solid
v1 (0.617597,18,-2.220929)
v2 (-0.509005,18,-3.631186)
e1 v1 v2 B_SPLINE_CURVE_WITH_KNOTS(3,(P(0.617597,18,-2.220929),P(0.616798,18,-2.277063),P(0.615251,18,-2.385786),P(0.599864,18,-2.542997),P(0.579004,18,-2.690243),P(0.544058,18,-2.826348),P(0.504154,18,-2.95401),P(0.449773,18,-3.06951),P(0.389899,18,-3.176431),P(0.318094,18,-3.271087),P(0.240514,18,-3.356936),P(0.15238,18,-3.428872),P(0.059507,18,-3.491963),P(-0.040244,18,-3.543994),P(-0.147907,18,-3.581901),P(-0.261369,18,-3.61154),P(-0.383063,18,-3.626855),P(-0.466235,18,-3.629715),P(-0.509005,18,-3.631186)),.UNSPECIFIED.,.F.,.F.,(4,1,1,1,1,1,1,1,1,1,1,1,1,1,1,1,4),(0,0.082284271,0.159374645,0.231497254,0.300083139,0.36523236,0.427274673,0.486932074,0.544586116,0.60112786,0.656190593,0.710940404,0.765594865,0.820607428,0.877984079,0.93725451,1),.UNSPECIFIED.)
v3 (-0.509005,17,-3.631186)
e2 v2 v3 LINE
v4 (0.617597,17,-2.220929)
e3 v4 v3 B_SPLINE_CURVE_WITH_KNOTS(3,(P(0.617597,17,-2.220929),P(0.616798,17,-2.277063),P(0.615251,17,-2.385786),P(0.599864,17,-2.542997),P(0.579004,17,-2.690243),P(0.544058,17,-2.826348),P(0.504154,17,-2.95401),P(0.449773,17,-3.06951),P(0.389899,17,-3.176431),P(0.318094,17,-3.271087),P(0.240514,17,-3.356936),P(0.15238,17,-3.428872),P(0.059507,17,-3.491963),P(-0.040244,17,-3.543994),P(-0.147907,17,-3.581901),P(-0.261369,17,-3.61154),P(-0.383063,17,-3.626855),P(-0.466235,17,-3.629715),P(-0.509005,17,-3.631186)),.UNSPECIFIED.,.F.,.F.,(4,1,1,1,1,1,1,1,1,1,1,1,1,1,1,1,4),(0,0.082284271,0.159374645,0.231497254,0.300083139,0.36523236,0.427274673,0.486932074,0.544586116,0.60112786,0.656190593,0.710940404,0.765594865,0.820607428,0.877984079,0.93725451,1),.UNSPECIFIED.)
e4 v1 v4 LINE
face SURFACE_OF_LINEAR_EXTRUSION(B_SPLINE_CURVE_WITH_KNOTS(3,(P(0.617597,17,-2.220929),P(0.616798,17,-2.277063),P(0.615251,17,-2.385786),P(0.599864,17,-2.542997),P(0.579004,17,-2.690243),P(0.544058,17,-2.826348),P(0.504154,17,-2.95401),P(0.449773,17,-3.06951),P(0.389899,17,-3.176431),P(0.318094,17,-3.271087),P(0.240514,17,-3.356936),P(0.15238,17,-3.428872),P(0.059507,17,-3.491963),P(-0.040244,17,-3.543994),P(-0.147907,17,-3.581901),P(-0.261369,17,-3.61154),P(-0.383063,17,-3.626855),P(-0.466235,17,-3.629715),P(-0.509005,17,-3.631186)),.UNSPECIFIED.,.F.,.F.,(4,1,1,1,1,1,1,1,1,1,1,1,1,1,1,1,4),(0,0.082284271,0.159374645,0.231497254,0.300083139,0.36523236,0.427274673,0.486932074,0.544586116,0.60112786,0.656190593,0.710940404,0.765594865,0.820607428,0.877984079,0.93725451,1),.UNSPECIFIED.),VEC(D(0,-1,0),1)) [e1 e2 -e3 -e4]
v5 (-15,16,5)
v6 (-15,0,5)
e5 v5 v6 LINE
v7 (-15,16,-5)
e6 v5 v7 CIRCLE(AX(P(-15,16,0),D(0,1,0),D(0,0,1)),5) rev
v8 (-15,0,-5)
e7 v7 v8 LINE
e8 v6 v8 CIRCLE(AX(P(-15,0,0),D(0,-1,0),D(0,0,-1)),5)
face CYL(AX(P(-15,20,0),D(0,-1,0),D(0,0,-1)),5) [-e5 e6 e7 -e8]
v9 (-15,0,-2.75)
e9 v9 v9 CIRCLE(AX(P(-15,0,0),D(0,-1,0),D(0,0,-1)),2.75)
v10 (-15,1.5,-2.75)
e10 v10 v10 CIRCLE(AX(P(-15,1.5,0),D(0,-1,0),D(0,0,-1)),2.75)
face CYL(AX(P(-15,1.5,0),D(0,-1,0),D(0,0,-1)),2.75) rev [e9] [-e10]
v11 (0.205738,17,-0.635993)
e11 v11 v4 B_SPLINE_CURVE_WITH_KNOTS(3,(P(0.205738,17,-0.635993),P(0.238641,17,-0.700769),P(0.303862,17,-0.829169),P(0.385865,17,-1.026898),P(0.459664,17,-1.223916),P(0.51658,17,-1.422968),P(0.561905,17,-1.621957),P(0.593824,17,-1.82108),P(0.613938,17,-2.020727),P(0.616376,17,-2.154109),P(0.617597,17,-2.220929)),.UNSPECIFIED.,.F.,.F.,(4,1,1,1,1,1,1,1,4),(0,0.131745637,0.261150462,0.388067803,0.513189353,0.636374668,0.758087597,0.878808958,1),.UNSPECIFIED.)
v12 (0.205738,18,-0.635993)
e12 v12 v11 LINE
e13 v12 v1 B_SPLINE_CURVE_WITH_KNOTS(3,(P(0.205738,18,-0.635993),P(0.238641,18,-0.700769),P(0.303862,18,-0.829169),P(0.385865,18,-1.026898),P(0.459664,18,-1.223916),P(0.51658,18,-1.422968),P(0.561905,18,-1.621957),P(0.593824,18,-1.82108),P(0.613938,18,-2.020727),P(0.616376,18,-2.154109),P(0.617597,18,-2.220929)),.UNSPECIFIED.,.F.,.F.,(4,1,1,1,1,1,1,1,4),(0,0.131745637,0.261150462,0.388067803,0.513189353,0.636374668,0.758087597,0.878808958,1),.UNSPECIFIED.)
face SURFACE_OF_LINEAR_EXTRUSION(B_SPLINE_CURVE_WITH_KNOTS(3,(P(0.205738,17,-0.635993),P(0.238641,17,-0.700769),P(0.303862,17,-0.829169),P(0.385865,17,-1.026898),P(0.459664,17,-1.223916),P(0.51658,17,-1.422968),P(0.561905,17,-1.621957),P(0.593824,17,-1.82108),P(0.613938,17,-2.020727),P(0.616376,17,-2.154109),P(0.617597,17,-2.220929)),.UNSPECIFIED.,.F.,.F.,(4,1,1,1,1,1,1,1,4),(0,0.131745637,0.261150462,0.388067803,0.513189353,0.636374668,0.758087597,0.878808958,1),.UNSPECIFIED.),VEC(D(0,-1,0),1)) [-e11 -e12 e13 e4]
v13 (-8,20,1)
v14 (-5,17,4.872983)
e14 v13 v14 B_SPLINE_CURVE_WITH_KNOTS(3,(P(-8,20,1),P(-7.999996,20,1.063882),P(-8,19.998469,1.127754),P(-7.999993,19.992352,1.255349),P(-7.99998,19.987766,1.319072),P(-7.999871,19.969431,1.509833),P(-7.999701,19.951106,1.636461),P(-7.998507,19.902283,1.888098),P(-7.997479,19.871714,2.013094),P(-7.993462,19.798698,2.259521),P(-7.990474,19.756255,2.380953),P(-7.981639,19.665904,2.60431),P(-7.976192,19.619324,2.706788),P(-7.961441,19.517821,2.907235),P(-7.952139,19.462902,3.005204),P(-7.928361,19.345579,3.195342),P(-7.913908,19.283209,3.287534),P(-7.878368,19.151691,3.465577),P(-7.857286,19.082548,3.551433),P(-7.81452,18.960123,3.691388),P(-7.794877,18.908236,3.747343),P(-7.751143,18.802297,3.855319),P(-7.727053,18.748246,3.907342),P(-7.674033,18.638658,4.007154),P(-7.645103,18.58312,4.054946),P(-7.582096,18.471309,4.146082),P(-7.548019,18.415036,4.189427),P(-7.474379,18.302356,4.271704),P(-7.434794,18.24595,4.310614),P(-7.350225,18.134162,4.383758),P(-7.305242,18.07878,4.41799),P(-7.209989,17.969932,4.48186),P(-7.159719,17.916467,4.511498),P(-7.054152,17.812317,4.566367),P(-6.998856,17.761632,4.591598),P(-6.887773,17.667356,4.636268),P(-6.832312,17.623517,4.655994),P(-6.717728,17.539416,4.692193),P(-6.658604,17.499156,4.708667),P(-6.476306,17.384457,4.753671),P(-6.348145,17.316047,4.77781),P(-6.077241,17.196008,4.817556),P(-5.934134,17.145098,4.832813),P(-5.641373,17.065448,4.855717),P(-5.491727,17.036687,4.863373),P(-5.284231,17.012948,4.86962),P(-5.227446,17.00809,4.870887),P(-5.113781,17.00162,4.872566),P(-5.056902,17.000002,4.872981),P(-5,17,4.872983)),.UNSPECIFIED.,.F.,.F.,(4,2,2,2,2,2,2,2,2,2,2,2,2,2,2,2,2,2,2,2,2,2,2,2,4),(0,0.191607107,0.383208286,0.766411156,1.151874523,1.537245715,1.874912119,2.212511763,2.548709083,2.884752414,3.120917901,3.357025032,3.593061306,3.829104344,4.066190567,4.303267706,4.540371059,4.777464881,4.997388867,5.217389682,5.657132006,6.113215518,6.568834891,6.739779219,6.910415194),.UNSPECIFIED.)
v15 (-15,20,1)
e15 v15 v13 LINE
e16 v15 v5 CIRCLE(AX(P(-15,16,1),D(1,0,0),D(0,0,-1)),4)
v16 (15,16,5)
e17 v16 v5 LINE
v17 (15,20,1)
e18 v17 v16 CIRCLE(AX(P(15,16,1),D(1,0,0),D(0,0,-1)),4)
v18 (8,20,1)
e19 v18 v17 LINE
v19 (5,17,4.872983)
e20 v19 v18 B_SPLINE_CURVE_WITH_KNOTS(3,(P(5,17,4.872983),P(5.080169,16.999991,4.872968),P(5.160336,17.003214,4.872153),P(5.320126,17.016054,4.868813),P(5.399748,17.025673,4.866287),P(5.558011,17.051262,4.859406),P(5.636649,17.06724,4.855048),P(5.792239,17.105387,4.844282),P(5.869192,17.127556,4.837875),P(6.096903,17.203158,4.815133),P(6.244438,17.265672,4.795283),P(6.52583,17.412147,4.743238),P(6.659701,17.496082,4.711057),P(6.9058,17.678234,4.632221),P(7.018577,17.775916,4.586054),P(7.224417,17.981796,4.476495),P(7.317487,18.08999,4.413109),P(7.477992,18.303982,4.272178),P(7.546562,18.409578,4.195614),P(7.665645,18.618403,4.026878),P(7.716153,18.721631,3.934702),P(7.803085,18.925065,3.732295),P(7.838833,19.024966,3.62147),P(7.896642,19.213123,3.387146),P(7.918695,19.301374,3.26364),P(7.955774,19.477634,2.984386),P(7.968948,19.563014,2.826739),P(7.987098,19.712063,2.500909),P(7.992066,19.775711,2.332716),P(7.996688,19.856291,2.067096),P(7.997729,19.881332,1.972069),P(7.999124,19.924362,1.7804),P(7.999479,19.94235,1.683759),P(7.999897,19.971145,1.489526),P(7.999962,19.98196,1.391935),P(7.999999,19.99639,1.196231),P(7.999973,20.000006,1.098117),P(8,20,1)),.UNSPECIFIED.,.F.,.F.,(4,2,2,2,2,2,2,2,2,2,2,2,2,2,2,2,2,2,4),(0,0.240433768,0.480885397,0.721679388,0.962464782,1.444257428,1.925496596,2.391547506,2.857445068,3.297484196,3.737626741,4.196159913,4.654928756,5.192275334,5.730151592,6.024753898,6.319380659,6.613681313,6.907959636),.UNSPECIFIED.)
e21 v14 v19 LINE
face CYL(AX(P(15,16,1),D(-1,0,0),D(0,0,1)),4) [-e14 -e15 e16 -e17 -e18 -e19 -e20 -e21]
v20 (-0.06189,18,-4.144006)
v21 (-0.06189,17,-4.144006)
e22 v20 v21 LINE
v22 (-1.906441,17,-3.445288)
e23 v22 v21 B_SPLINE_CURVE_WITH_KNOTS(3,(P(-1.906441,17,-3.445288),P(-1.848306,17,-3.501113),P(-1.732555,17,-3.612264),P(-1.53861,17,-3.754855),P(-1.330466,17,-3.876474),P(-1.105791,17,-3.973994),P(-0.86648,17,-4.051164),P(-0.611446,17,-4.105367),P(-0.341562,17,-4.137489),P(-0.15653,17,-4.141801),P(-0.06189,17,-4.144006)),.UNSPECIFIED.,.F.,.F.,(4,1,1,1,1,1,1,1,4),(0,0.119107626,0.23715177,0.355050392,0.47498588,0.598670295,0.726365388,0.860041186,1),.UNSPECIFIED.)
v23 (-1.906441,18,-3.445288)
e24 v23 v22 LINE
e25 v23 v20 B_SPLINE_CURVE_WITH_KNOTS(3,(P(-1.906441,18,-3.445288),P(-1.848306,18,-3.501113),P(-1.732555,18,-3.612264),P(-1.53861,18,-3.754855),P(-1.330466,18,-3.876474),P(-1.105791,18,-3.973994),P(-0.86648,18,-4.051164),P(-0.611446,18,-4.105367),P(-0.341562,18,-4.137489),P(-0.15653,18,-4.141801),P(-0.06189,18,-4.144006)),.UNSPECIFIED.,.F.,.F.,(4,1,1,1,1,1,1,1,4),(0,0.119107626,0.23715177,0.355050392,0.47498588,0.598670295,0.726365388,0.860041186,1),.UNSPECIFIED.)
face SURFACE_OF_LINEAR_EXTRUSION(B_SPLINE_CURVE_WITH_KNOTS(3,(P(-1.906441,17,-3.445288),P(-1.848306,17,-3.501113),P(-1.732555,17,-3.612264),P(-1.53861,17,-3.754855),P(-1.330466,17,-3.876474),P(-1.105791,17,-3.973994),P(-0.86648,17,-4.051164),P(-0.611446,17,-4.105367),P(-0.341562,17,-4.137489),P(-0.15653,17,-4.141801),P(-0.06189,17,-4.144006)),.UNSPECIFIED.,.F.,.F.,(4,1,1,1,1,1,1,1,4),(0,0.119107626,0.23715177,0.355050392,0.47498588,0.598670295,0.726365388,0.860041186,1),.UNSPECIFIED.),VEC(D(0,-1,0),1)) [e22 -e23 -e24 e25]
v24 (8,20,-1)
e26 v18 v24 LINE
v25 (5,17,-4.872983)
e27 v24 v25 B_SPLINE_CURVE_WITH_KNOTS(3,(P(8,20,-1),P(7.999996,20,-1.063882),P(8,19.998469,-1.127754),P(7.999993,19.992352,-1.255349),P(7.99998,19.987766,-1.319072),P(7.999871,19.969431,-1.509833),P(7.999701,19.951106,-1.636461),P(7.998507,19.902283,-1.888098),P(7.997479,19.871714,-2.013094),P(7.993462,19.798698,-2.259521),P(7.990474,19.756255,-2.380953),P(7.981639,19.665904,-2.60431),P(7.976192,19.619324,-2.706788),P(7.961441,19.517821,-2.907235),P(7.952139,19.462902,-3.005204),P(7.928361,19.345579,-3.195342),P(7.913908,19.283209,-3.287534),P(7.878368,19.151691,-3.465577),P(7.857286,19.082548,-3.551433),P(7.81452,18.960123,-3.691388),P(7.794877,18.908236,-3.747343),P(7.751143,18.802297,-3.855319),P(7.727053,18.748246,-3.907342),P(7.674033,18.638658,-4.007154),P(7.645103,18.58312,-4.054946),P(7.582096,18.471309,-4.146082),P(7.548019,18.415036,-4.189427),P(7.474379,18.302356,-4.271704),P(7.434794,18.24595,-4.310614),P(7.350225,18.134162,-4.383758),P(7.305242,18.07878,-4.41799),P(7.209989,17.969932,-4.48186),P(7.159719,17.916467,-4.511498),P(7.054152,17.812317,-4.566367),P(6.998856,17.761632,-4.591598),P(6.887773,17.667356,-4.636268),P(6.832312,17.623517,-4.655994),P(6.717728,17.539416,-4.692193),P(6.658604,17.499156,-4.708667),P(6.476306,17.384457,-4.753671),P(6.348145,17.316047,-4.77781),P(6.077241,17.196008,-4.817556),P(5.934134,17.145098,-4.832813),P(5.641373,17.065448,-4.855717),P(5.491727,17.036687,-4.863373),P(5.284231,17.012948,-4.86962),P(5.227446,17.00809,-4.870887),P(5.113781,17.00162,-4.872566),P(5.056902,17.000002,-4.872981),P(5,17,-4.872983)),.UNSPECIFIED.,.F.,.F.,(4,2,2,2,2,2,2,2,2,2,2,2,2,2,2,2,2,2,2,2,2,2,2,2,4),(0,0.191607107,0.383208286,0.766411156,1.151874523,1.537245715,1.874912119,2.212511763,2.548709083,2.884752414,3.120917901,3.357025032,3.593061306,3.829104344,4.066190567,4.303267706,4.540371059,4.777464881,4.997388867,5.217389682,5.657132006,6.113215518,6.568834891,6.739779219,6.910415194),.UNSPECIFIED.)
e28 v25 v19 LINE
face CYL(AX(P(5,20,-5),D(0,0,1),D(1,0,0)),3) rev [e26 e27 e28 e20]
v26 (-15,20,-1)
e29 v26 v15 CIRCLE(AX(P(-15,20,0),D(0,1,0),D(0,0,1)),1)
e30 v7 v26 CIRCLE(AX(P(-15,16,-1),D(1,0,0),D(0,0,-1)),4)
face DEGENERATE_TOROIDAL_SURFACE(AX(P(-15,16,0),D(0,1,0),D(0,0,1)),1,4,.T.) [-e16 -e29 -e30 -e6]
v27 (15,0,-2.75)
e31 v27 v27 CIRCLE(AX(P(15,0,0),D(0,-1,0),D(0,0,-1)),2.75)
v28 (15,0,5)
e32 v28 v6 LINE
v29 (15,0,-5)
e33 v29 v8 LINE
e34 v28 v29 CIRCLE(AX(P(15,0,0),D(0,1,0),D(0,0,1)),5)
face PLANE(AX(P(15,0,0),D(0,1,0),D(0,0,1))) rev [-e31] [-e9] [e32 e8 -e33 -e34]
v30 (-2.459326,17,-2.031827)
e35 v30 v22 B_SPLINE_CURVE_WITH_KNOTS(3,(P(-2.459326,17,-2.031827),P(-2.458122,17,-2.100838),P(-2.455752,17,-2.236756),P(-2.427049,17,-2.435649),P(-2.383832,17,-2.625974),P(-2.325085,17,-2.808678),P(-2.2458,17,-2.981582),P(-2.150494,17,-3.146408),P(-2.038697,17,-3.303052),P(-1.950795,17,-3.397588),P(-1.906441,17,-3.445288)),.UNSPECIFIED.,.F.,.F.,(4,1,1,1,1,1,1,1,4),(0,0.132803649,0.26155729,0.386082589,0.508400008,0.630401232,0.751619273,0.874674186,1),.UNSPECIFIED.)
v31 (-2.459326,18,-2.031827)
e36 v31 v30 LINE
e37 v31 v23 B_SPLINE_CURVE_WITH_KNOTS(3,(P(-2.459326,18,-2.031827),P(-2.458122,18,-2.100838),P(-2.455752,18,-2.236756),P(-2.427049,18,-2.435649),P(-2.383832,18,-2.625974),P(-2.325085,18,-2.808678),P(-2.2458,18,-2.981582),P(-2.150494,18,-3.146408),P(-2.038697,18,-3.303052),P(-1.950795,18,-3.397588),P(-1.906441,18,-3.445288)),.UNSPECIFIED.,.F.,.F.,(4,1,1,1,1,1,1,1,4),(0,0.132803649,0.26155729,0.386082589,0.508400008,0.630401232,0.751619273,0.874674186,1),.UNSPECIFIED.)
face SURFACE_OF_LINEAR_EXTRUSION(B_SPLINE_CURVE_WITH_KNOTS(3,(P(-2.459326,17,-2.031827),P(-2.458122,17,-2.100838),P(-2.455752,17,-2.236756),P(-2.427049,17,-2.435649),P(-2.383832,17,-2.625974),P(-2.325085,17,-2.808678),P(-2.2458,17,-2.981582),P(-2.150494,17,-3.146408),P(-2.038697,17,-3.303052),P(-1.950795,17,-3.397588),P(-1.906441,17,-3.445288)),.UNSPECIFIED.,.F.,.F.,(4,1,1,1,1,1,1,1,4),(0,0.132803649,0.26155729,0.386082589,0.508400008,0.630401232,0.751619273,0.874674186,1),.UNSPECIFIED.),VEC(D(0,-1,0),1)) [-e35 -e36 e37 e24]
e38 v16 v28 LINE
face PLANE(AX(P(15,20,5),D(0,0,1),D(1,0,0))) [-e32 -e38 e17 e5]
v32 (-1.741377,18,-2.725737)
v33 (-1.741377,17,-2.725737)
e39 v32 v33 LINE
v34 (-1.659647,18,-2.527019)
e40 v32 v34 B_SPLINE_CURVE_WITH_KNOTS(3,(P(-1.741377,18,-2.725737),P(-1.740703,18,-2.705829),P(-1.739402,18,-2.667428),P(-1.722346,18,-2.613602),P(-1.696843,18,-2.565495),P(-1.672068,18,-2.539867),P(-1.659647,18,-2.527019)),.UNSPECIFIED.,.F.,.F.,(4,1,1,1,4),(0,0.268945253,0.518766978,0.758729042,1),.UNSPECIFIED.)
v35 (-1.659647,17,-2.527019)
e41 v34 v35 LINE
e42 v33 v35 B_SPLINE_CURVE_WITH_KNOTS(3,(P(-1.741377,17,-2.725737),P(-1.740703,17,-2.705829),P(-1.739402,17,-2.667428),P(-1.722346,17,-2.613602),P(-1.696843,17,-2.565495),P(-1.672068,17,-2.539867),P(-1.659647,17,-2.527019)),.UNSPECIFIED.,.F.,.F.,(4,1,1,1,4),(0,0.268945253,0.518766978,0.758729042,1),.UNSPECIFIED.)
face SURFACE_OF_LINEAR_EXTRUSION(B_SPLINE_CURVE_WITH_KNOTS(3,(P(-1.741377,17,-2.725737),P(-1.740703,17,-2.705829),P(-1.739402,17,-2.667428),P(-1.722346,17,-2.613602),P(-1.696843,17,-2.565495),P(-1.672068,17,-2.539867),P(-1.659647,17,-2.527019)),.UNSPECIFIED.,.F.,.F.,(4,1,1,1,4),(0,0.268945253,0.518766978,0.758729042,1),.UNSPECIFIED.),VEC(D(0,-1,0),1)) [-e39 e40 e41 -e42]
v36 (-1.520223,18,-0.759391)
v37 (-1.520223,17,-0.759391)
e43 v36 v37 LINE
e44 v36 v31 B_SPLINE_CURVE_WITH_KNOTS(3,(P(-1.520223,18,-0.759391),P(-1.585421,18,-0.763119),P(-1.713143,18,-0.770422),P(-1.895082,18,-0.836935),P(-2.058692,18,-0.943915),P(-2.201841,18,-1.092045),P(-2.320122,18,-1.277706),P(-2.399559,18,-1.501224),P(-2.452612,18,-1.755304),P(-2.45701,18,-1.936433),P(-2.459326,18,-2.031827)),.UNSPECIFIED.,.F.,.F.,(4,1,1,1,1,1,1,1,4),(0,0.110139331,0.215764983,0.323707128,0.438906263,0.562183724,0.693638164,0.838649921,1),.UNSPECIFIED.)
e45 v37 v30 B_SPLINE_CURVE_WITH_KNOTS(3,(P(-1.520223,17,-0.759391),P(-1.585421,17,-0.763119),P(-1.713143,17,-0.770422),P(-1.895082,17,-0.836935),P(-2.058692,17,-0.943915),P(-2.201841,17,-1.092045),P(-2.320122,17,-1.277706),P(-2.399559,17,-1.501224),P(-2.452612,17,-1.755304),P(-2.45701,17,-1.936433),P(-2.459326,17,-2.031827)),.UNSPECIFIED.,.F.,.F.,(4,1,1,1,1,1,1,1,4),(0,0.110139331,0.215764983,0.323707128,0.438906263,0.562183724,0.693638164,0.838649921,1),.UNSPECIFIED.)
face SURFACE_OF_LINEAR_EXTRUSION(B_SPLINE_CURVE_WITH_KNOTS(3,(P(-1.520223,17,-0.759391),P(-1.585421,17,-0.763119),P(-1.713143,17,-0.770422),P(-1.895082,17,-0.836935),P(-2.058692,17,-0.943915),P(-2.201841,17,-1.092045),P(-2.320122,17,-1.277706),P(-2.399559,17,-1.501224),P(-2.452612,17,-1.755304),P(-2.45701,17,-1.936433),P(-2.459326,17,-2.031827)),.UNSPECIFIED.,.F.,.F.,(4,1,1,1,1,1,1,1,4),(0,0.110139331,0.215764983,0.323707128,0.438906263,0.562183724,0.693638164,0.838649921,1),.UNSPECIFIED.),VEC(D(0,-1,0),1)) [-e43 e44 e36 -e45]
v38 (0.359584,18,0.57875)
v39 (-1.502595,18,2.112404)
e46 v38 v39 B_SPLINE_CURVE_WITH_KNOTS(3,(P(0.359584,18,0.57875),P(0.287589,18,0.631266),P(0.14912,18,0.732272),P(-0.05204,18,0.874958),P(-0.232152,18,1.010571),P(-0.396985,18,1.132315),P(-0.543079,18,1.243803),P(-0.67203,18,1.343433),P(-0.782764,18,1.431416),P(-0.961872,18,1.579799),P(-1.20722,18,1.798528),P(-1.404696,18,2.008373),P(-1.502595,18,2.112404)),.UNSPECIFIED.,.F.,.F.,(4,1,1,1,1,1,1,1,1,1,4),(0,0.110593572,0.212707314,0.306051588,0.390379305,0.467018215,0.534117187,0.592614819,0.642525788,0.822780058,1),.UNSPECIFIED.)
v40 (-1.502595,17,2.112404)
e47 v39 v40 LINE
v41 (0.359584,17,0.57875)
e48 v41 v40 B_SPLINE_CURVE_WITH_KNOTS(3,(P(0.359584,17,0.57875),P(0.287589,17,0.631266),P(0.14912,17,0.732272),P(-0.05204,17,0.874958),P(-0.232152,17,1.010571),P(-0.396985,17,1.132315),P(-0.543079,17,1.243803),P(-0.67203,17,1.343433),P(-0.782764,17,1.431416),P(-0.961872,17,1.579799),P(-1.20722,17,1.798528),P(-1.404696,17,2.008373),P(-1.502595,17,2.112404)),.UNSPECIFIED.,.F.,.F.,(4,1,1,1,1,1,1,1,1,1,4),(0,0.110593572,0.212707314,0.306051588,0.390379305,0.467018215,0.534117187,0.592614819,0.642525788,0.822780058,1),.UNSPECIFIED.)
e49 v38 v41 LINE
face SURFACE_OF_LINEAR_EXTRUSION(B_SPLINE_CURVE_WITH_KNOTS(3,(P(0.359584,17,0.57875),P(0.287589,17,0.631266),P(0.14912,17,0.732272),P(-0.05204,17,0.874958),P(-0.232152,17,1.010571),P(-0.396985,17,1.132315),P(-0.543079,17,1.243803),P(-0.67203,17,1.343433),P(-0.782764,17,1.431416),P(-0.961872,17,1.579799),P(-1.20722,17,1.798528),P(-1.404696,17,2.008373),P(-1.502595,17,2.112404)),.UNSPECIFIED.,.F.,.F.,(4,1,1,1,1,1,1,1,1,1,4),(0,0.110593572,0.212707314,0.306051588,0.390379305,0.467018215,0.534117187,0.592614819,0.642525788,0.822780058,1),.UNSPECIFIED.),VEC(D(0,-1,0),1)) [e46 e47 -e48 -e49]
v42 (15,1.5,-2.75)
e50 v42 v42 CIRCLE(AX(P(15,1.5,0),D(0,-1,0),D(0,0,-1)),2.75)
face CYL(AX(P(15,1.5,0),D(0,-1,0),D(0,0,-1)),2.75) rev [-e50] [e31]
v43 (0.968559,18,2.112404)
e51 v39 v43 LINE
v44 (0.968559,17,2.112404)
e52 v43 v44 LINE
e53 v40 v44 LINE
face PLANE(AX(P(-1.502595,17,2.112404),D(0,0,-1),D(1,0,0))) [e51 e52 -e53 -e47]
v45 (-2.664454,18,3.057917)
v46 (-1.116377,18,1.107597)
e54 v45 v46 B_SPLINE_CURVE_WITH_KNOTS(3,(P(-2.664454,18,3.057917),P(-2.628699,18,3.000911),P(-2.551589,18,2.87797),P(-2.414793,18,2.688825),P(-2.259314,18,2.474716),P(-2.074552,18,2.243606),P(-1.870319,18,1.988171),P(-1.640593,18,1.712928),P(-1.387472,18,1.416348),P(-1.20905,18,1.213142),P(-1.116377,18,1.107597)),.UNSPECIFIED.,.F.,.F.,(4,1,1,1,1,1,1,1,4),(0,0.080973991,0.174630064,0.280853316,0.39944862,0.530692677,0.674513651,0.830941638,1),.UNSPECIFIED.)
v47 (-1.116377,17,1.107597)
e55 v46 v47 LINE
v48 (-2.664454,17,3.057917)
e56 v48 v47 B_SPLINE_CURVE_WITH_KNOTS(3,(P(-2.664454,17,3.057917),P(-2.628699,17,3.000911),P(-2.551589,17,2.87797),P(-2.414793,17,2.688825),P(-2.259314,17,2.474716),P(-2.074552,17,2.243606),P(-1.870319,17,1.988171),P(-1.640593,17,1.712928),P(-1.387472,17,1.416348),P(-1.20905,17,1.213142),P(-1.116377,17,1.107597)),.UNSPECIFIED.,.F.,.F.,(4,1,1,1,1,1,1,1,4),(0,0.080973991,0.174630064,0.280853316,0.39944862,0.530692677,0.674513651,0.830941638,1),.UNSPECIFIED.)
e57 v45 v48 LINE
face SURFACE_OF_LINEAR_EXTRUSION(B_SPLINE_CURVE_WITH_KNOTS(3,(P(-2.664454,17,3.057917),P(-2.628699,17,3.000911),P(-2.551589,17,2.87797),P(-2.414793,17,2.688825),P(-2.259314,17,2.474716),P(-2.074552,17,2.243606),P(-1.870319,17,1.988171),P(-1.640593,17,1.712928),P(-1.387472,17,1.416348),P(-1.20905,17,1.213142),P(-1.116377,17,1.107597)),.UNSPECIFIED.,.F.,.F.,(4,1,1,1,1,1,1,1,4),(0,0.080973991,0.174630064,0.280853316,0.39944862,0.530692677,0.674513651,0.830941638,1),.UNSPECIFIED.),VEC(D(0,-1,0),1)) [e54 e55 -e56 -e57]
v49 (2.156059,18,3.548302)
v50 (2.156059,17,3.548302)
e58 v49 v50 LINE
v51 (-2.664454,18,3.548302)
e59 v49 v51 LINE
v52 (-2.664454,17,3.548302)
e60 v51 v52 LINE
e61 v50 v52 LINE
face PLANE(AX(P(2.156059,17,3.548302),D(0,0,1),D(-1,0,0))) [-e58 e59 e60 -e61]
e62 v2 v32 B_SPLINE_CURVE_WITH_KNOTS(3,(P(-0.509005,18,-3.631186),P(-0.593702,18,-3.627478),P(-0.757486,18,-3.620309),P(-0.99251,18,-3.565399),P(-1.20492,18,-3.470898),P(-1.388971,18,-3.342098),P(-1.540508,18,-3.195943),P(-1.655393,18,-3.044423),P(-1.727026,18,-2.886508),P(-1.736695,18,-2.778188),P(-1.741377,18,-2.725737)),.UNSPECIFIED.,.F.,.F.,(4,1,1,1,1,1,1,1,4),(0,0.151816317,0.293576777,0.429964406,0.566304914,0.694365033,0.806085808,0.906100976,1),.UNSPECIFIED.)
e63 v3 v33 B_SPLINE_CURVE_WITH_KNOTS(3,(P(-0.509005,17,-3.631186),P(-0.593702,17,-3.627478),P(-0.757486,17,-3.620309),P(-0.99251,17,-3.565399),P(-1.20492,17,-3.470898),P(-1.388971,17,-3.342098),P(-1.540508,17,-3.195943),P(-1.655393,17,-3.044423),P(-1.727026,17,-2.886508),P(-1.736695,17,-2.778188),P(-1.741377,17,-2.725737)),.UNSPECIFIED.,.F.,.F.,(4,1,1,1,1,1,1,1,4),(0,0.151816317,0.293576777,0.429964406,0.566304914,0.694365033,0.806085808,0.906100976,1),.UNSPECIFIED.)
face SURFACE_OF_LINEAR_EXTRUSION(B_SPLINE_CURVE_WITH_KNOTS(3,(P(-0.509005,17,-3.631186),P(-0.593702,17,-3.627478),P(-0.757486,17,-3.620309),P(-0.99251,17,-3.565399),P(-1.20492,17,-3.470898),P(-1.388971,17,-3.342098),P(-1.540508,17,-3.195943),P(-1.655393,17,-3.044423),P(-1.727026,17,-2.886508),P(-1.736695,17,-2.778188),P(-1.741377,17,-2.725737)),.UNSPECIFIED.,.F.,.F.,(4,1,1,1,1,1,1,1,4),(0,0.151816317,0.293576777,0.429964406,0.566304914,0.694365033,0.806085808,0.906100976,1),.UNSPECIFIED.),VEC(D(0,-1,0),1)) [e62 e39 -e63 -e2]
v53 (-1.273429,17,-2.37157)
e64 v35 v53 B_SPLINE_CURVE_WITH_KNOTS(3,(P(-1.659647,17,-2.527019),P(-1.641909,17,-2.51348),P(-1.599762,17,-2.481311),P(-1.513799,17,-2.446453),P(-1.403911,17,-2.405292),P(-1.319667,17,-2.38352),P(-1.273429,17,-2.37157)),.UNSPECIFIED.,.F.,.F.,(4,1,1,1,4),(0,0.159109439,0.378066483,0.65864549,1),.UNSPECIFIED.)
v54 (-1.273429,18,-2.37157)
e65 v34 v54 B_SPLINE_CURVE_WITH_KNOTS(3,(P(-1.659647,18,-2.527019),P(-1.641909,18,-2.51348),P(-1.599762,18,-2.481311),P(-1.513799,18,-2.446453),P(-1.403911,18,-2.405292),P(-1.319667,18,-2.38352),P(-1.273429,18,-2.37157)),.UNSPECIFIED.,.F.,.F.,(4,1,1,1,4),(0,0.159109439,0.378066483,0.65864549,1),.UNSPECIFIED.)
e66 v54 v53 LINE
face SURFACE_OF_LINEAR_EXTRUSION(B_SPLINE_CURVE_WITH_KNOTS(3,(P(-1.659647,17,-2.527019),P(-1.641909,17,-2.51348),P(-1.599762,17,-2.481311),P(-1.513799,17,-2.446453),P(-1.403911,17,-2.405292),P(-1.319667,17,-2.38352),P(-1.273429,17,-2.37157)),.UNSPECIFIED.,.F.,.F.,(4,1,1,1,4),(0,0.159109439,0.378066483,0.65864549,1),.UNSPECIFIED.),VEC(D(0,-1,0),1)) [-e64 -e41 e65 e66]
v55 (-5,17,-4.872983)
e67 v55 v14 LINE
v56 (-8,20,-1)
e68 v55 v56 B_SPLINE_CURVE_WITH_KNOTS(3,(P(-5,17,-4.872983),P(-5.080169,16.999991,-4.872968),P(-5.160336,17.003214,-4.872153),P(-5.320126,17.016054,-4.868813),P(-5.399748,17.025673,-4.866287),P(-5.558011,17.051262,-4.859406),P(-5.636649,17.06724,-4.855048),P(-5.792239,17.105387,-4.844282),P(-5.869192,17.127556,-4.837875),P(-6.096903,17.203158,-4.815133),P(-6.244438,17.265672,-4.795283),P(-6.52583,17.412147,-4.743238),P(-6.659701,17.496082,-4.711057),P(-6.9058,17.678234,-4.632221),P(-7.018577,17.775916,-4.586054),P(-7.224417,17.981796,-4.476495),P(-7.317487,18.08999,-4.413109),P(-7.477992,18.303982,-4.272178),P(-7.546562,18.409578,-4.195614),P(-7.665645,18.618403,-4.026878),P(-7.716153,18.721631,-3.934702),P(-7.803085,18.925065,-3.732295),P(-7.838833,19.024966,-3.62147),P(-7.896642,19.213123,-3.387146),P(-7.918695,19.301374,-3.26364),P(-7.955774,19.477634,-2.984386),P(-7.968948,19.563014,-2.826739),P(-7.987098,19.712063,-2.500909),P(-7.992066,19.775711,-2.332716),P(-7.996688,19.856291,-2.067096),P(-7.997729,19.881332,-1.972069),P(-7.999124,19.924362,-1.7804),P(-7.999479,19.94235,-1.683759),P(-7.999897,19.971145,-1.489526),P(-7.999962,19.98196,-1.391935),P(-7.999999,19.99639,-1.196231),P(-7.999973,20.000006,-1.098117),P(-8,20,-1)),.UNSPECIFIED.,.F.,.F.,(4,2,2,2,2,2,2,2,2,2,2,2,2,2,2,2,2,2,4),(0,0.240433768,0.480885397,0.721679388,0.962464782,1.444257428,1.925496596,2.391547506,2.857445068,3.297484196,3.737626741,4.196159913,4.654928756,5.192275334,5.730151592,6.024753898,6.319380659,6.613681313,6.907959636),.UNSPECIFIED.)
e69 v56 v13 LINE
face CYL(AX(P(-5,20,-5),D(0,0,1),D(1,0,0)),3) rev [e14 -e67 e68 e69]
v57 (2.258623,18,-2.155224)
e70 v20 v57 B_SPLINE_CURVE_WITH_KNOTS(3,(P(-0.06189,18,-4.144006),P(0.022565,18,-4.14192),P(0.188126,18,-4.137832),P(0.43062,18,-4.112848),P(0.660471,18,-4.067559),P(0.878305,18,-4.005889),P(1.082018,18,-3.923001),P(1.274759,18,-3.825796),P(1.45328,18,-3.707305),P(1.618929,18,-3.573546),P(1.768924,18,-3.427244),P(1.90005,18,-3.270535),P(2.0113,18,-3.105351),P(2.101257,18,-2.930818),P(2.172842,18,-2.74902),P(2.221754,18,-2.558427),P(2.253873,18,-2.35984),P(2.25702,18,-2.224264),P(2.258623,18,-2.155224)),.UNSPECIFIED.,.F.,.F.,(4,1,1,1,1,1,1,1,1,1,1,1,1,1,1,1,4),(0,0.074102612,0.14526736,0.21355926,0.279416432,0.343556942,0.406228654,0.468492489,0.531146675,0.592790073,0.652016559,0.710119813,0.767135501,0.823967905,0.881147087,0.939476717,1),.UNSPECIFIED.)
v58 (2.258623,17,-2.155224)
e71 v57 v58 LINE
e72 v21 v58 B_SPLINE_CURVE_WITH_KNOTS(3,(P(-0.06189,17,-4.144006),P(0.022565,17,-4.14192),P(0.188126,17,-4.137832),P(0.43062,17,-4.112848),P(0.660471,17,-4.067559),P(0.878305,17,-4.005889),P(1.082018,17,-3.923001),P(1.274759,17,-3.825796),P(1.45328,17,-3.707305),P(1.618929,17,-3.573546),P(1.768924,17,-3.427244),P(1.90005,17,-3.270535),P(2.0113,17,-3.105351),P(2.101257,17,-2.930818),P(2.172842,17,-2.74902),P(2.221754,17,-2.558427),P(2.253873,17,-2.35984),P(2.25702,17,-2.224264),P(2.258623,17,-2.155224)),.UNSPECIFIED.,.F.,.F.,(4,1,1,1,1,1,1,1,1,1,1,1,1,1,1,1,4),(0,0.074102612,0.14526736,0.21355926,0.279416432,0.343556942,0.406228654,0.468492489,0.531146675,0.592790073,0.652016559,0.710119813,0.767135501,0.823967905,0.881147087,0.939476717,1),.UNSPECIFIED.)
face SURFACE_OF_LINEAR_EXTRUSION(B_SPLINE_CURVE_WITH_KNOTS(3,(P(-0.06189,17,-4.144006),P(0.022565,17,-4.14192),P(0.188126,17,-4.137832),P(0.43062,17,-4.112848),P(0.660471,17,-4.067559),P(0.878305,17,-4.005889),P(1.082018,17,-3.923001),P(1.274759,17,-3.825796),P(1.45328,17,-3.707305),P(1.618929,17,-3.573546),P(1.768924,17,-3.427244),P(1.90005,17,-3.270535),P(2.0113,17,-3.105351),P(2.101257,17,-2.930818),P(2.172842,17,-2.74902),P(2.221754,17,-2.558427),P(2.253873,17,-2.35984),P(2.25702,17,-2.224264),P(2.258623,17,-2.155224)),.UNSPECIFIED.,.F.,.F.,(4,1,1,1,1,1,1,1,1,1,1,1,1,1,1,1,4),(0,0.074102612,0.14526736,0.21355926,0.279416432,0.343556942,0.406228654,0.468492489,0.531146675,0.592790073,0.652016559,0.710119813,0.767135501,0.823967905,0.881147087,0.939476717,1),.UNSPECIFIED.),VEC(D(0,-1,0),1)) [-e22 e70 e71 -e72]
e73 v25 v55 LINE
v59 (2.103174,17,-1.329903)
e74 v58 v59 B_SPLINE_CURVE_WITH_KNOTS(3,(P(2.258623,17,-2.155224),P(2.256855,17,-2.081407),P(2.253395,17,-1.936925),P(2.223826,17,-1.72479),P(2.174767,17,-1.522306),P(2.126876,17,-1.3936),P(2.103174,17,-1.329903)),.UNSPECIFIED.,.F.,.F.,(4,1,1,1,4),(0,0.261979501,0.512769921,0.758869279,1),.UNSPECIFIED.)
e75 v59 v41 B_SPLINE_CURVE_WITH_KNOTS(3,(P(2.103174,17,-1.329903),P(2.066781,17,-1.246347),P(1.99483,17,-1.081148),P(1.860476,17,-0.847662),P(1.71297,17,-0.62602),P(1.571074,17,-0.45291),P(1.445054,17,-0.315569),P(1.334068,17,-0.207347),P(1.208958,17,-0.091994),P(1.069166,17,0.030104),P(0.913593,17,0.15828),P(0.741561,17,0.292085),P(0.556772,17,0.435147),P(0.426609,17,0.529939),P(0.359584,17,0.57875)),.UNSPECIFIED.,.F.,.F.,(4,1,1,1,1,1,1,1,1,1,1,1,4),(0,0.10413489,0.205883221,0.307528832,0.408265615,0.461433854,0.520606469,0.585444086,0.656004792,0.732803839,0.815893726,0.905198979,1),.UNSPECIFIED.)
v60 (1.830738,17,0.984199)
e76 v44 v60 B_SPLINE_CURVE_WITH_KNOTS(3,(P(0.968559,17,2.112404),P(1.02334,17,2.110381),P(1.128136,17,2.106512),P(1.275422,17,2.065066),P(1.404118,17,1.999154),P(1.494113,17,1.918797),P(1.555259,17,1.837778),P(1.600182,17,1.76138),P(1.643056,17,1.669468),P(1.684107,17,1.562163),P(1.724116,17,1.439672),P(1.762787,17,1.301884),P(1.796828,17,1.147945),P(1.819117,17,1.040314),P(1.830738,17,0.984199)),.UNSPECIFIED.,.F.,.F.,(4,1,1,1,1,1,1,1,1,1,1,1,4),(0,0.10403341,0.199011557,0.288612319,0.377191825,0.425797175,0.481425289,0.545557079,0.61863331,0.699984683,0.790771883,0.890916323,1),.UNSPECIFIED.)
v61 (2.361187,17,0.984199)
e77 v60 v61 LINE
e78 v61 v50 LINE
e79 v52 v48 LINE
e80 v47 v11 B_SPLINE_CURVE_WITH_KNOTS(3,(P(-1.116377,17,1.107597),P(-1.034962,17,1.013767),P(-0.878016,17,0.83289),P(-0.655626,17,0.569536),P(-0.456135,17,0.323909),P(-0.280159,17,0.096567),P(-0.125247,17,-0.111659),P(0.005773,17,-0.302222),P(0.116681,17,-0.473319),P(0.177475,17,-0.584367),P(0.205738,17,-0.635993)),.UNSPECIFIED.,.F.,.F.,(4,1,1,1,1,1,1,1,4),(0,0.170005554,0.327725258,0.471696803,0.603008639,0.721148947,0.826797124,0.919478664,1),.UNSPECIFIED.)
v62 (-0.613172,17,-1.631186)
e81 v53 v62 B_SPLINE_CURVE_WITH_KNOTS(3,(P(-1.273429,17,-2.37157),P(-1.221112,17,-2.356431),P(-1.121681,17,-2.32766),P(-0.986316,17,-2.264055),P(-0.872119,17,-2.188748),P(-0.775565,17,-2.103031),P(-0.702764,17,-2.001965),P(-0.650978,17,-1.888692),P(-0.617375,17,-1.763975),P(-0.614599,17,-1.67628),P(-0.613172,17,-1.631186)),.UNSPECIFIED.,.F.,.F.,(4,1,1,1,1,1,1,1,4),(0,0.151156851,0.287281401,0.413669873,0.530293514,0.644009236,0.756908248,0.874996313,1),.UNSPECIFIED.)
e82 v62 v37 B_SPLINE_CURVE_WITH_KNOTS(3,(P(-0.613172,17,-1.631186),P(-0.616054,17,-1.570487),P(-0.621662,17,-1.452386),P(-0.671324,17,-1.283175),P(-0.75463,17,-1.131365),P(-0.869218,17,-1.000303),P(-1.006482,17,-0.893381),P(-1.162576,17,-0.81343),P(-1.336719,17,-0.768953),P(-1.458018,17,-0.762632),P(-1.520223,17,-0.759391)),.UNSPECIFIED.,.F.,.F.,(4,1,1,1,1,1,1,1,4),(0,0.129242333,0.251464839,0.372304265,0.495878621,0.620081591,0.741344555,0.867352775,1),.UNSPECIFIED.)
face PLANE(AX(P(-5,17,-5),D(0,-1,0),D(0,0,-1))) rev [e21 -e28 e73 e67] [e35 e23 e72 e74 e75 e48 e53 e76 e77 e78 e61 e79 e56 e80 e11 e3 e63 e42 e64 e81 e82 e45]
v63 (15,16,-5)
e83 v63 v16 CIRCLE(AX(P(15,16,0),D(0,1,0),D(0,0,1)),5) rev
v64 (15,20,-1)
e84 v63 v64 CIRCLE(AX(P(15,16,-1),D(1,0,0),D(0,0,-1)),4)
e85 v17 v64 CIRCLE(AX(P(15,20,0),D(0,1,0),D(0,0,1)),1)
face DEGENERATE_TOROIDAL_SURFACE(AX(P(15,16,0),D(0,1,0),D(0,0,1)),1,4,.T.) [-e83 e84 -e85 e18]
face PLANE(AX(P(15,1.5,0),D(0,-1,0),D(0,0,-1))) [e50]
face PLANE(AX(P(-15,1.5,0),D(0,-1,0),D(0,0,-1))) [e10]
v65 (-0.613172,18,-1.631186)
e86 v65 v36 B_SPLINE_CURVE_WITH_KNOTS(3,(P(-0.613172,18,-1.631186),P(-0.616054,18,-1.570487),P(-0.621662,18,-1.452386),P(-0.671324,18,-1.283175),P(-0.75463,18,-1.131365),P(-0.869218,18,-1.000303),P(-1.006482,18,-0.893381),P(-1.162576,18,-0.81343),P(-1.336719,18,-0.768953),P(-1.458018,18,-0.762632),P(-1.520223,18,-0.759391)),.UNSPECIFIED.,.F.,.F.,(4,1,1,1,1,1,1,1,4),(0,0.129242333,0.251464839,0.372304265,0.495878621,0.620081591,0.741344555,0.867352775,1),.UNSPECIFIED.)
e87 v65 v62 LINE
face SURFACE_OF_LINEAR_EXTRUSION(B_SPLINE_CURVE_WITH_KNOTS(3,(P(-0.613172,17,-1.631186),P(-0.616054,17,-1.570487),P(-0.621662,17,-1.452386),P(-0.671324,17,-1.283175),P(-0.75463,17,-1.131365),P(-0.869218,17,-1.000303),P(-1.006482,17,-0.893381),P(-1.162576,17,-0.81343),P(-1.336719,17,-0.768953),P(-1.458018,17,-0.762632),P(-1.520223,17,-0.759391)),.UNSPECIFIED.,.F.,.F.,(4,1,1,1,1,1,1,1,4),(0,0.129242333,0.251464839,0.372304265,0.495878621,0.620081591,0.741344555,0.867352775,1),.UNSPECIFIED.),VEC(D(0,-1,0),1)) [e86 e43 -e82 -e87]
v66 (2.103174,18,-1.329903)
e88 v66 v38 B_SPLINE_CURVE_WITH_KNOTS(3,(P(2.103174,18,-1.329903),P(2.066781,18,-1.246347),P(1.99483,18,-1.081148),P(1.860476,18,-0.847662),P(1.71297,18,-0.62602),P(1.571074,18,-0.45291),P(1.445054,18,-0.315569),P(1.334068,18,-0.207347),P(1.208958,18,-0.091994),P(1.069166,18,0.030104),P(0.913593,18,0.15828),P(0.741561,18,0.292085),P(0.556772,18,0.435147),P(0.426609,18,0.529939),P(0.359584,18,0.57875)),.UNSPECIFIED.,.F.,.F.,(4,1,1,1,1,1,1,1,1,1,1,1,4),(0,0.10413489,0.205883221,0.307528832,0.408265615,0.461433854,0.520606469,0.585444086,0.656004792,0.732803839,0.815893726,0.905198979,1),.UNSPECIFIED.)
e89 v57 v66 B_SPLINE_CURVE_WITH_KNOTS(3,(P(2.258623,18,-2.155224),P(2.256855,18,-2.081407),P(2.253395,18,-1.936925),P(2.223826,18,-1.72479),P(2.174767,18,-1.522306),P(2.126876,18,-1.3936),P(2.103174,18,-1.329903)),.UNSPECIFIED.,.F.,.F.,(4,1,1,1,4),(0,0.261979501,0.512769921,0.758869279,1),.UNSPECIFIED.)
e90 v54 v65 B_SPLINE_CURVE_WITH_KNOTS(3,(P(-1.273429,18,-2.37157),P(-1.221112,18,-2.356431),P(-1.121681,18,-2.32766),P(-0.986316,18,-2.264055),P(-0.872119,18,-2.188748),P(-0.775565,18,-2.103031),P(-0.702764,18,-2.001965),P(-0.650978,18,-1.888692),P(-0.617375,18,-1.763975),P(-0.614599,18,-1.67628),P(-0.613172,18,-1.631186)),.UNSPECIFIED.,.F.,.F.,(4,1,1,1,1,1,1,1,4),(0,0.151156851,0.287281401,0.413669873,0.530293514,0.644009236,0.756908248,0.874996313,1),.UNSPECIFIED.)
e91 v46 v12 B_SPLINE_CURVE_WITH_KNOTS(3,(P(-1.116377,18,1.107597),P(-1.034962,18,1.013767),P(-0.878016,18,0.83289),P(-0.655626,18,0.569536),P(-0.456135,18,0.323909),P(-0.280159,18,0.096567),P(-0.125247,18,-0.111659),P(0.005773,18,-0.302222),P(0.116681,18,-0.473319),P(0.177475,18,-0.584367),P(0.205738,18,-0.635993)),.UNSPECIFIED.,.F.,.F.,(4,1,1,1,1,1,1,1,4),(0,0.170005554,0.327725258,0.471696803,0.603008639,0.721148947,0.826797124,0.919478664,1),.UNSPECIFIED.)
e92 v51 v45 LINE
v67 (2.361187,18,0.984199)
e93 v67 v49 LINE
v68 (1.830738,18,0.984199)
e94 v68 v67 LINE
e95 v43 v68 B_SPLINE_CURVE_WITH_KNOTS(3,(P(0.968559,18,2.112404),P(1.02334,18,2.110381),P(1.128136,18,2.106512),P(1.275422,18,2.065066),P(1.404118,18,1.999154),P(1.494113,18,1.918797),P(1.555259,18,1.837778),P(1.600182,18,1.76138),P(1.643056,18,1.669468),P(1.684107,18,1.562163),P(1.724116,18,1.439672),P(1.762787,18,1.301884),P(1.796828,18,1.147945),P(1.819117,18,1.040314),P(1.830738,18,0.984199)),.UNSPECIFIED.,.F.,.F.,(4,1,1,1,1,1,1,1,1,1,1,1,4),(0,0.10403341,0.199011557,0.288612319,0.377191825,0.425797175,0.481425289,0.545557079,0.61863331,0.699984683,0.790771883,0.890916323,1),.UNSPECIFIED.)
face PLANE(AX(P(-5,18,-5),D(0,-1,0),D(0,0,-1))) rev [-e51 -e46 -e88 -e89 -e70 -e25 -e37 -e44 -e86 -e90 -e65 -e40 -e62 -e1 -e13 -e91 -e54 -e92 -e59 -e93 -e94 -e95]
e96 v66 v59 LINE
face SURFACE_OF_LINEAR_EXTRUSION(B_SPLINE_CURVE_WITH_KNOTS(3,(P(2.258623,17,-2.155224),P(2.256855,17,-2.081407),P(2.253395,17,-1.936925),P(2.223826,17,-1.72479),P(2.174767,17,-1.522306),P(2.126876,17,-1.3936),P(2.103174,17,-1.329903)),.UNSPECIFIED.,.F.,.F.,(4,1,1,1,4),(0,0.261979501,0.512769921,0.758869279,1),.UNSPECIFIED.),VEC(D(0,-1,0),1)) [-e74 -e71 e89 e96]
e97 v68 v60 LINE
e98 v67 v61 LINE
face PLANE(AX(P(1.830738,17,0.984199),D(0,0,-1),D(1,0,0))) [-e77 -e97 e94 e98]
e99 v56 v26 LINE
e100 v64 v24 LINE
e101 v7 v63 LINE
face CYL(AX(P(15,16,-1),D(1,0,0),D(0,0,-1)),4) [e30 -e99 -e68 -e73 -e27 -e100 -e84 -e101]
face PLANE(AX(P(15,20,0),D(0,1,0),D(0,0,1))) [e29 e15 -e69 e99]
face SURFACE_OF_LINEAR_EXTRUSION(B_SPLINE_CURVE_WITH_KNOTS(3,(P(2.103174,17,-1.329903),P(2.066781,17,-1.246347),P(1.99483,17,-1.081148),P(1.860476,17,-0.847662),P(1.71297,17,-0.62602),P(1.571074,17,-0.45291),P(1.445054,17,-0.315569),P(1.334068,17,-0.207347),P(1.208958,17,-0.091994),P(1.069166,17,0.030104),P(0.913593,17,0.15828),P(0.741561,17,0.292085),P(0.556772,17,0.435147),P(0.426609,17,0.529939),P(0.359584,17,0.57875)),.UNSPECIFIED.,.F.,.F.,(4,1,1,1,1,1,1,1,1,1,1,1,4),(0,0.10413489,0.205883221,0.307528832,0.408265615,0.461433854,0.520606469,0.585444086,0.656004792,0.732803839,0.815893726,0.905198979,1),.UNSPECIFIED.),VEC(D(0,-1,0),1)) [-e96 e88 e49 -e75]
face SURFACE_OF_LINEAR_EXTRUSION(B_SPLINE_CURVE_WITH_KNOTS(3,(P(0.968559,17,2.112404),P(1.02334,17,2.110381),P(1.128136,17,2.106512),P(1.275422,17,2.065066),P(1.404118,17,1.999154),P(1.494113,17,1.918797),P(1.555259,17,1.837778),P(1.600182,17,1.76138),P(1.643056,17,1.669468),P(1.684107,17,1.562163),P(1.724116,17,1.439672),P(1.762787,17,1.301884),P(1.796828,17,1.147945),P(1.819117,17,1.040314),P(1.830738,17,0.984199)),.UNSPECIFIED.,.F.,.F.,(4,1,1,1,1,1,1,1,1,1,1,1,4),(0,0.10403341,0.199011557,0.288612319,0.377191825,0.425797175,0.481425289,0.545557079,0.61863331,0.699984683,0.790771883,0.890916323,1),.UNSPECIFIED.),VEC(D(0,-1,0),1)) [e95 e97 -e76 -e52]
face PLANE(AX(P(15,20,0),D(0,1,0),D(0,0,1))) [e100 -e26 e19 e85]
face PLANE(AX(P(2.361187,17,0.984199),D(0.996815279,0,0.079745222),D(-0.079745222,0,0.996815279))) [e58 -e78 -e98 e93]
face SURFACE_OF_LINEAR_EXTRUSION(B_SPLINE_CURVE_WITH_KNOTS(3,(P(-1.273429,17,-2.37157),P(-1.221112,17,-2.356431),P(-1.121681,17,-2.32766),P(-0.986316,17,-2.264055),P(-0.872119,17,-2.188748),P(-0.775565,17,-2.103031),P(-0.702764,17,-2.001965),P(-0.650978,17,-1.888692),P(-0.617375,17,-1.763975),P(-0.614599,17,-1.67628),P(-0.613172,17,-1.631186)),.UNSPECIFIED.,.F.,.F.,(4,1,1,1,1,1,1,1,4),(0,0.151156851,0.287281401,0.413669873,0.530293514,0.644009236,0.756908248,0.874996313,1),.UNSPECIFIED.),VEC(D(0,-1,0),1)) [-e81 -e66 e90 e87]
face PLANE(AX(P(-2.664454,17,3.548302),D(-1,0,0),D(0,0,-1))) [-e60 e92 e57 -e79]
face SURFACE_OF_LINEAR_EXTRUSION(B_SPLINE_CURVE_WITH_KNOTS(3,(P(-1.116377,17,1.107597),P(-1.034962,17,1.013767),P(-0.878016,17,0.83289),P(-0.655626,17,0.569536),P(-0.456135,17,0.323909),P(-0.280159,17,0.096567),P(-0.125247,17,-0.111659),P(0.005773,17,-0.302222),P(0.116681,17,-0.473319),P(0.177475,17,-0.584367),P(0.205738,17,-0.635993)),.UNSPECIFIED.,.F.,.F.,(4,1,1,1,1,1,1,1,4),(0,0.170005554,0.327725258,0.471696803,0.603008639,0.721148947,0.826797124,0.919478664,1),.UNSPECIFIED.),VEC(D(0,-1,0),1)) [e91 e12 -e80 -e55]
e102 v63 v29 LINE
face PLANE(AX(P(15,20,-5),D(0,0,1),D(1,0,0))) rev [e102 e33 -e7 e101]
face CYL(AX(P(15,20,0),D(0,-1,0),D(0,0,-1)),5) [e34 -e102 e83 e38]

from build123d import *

# Parameters (mm, degrees)
BOSS_EXTRUDE1_DEPTH     = 20
FILLET1_R               = 4
SKETCH2_R               = 2.75
CUT_EXTRUDE1_DEPTH      = 1.5
LPATTERN1_COUNT         = 2
LPATTERN1_PITCH         = 30
CUT_EXTRUDE2_DEPTH      = 29.722813233
CUT_EXTRUDE2_DEPTH_BACK = 29.722813233
WRAP1_DEPTH             = 1


# Read off the part's stored shape, not the designer's step: Wrap1
with BuildPart() as part:
    # Sketch1 → Boss-Extrude1 (new body)
    with BuildSketch(Plane(origin=(0, 0, 0), x_dir=(1, 0, 0), z_dir=(0, 1, 0))):
        with BuildLine():
            Line((15, -5), (-15, -5))
            ThreePointArc((-15, -5), (-20, 0), (-15, 5))
            Line((-15, 5), (15, 5))
            ThreePointArc((15, 5), (20, 0), (15, -5))
        make_face()
    extrude(amount=BOSS_EXTRUDE1_DEPTH)

    # Fillet1
    fillet1_edges = [part.edges().sort_by_distance(p)[0] for p in [
        (-20, 20, 0),
        (0, 20, 5),
        (20, 20, 0),
        (0, 20, -5),
    ]]
    fillet(fillet1_edges, radius=FILLET1_R)

    # Sketch2 → Cut-Extrude1 (cut)
    with BuildSketch(Plane.XZ):
        with Locations(Location((-15, 0, 0), (0, 0, 270))):
            Circle(SKETCH2_R)
    cut_extrude1 = extrude(amount=-CUT_EXTRUDE1_DEPTH, mode=Mode.SUBTRACT)

    # LPattern1: Cut-Extrude1 ×2
    with Locations(*[(i * LPATTERN1_PITCH, 0, 0) for i in range(1, LPATTERN1_COUNT)]):
        add(cut_extrude1, mode=Mode.SUBTRACT)

    # Sketch3 → Cut-Extrude2 (cut, two sides: drawn at the far end of the back side and taken through both)
    with BuildSketch(Plane.XY.offset(-CUT_EXTRUDE2_DEPTH_BACK)):
        with BuildLine():
            Line((-5, 23), (5, 23))
            ThreePointArc((5, 23), (8, 20), (5, 17))
            Line((5, 17), (-5, 17))
            ThreePointArc((-5, 17), (-8, 20), (-5, 23))
        make_face()
    extrude(amount=CUT_EXTRUDE2_DEPTH + CUT_EXTRUDE2_DEPTH_BACK, mode=Mode.SUBTRACT)

    # Wrap1 outline → Wrap1 (add)
    with BuildSketch(Plane(origin=(0, 17, 0), x_dir=(1, 0, 0), z_dir=(0, 1, 0))):
        with BuildLine():
            add(Edge.make_bspline(
                [(0.968558604, -2.112404227), (1.023340463, -2.110381468), (1.128135866, -2.106512015), (1.275421614, -2.065066433), (1.40411806, -1.999153831), (1.494113345, -1.918796765), (1.555259283, -1.8377784), (1.600182088, -1.761379971), (1.643056037, -1.669468115), (1.68410688, -1.562162987), (1.724115658, -1.439672484), (1.762787282, -1.301883834), (1.796828359, -1.147944523), (1.819117415, -1.040313742), (1.830738091, -0.984199098)],
                knots=[0, 0, 0, 0, 0.10403341, 0.199011557, 0.288612319, 0.377191825, 0.425797175, 0.481425289, 0.545557079, 0.61863331, 0.699984683, 0.790771883, 0.890916323, 1, 1, 1, 1], degree=3))
            Line((0.968558604, -2.112404227), (-1.502595242, -2.112404227))
            add(Edge.make_bspline(
                [(0.359584245, -0.57875038), (0.287589412, -0.631266446), (0.149119993, -0.732271876), (-0.052040125, -0.874957595), (-0.232151558, -1.010570949), (-0.396984875, -1.13231455), (-0.543079134, -1.243803459), (-0.672030163, -1.343433338), (-0.782764208, -1.43141572), (-0.961872458, -1.579798827), (-1.207220157, -1.798528227), (-1.40469562, -2.00837263), (-1.502595242, -2.112404227)],
                knots=[0, 0, 0, 0, 0.110593572, 0.212707314, 0.306051588, 0.390379305, 0.467018215, 0.534117187, 0.592614819, 0.642525788, 0.822780058, 1, 1, 1, 1], degree=3))
            add(Edge.make_bspline(
                [(2.103173989, 1.329903466), (2.066781163, 1.246346618), (1.99482956, 1.081147874), (1.86047631, 0.847661593), (1.71297016, 0.626020413), (1.571074283, 0.452909604), (1.445054335, 0.315568643), (1.334068385, 0.207346612), (1.208958187, 0.091994137), (1.069166496, -0.030104), (0.913592831, -0.158279882), (0.741560734, -0.29208501), (0.556771712, -0.435146764), (0.42660857, -0.529939289), (0.359584245, -0.57875038)],
                knots=[0, 0, 0, 0, 0.10413489, 0.205883221, 0.307528832, 0.408265615, 0.461433854, 0.520606469, 0.585444086, 0.656004792, 0.732803839, 0.815893726, 0.905198979, 1, 1, 1, 1], degree=3))
            add(Edge.make_bspline(
                [(2.258622707, 2.155223979), (2.256854974, 2.081406691), (2.253395008, 1.936924834), (2.223825952, 1.724789841), (2.174767432, 1.522306219), (2.126875674, 1.393600214), (2.103173989, 1.329903466)],
                knots=[0, 0, 0, 0, 0.261979501, 0.512769921, 0.758869279, 1, 1, 1, 1], degree=3))
            add(Edge.make_bspline(
                [(-0.061890114, 4.14400603), (0.022564629, 4.141920306), (0.18812583, 4.13783155), (0.430620451, 4.112847977), (0.660471364, 4.067558501), (0.878305178, 4.005888588), (1.082018473, 3.923000729), (1.274759097, 3.825795699), (1.453280397, 3.707304776), (1.618929442, 3.573545968), (1.768923738, 3.427244365), (1.900049838, 3.270535022), (2.011299511, 3.105351175), (2.101257211, 2.93081783), (2.172841542, 2.749020464), (2.221753805, 2.558426678), (2.253872753, 2.359840276), (2.257020026, 2.224263519), (2.258622707, 2.155223979)],
                knots=[0, 0, 0, 0, 0.074102612, 0.14526736, 0.21355926, 0.279416432, 0.343556942, 0.406228654, 0.468492489, 0.531146675, 0.592790073, 0.652016559, 0.710119813, 0.767135501, 0.823967905, 0.881147087, 0.939476717, 1, 1, 1, 1], degree=3))
            add(Edge.make_bspline(
                [(-1.906441396, 3.445288081), (-1.848306189, 3.501112989), (-1.732554849, 3.612264359), (-1.538609793, 3.754854821), (-1.330466242, 3.876473687), (-1.105791254, 3.973994027), (-0.866480346, 4.051164268), (-0.611446439, 4.105367467), (-0.341562002, 4.137488539), (-0.156530269, 4.14180053), (-0.061890114, 4.14400603)],
                knots=[0, 0, 0, 0, 0.119107626, 0.23715177, 0.355050392, 0.47498588, 0.598670295, 0.726365388, 0.860041186, 1, 1, 1, 1], degree=3))
            add(Edge.make_bspline(
                [(-2.459326011, 2.031826543), (-2.458122329, 2.10083777), (-2.455751672, 2.236755643), (-2.42704922, 2.435648535), (-2.383831572, 2.625974396), (-2.325084873, 2.808678323), (-2.245799792, 2.981581962), (-2.150493697, 3.146407777), (-2.038697096, 3.303051555), (-1.950794522, 3.397587797), (-1.906441396, 3.445288081)],
                knots=[0, 0, 0, 0, 0.132803649, 0.26155729, 0.386082589, 0.508400008, 0.630401232, 0.751619273, 0.874674186, 1, 1, 1, 1], degree=3))
            add(Edge.make_bspline(
                [(-1.520223447, 0.759390645), (-1.585420599, 0.763118791), (-1.713143024, 0.770422298), (-1.895082142, 0.836934937), (-2.058691576, 0.943915448), (-2.201841078, 1.092044894), (-2.320121913, 1.277705611), (-2.399559254, 1.501224402), (-2.452612405, 1.75530448), (-2.457009968, 1.936432658), (-2.459326011, 2.031826543)],
                knots=[0, 0, 0, 0, 0.110139331, 0.215764983, 0.323707128, 0.438906263, 0.562183724, 0.693638164, 0.838649921, 1, 1, 1, 1], degree=3))
            add(Edge.make_bspline(
                [(-0.613172165, 1.631185517), (-0.616054345, 1.570486701), (-0.621662157, 1.45238594), (-0.671323685, 1.283175242), (-0.754629801, 1.131365188), (-0.869218028, 1.000302814), (-1.00648217, 0.893380798), (-1.162575656, 0.81342959), (-1.336719307, 0.768952542), (-1.458017598, 0.762632021), (-1.520223447, 0.759390645)],
                knots=[0, 0, 0, 0, 0.129242333, 0.251464839, 0.372304265, 0.495878621, 0.620081591, 0.741344555, 0.867352775, 1, 1, 1, 1], degree=3))
            add(Edge.make_bspline(
                [(-1.273428575, 2.371570132), (-1.221111857, 2.356431424), (-1.121681232, 2.327659528), (-0.986315759, 2.264054818), (-0.872118751, 2.188748181), (-0.775565412, 2.103031066), (-0.702763657, 2.001965174), (-0.650977929, 1.888692008), (-0.61737495, 1.763975364), (-0.614599413, 1.676280399), (-0.613172165, 1.631185517)],
                knots=[0, 0, 0, 0, 0.151156851, 0.287281401, 0.413669873, 0.530293514, 0.644009236, 0.756908248, 0.874996313, 1, 1, 1, 1], degree=3))
            add(Edge.make_bspline(
                [(-1.659646524, 2.52701885), (-1.641908981, 2.5134804), (-1.599762076, 2.48131113), (-1.513799429, 2.446453071), (-1.403911325, 2.405291879), (-1.319666952, 2.383519902), (-1.273428575, 2.371570132)],
                knots=[0, 0, 0, 0, 0.159109439, 0.378066483, 0.65864549, 1, 1, 1, 1], degree=3))
            add(Edge.make_bspline(
                [(-1.741377293, 2.725736799), (-1.740702967, 2.705828636), (-1.739402264, 2.667427893), (-1.722346439, 2.613602242), (-1.696843256, 2.565494988), (-1.672067897, 2.539867464), (-1.659646524, 2.52701885)],
                knots=[0, 0, 0, 0, 0.268945253, 0.518766978, 0.758729042, 1, 1, 1, 1], degree=3))
            add(Edge.make_bspline(
                [(-0.509005498, 3.631185517), (-0.593702292, 3.627478268), (-0.757485819, 3.620309328), (-0.992510379, 3.565399378), (-1.204920463, 3.4708981), (-1.388970755, 3.342097951), (-1.54050767, 3.195942921), (-1.655393233, 3.044422755), (-1.727025811, 2.886507887), (-1.736695124, 2.778188345), (-1.741377293, 2.725736799)],
                knots=[0, 0, 0, 0, 0.151816317, 0.293576777, 0.429964406, 0.566304914, 0.694365033, 0.806085808, 0.906100976, 1, 1, 1, 1], degree=3))
            add(Edge.make_bspline(
                [(0.617597066, 2.220929107), (0.616798314, 2.277062503), (0.615251229, 2.385786079), (0.599863671, 2.542997259), (0.579004071, 2.690242583), (0.544058374, 2.826348498), (0.504153512, 2.954009696), (0.449772713, 3.069509609), (0.389899195, 3.176431124), (0.318093883, 3.271087373), (0.240513737, 3.356936451), (0.152380296, 3.428872442), (0.059506725, 3.491963217), (-0.040243661, 3.543993611), (-0.147906764, 3.581901434), (-0.261368703, 3.611540097), (-0.38306343, 3.626855058), (-0.466235221, 3.629714881), (-0.509005498, 3.631185517)],
                knots=[0, 0, 0, 0, 0.082284271, 0.159374645, 0.231497254, 0.300083139, 0.36523236, 0.427274673, 0.486932074, 0.544586116, 0.60112786, 0.656190593, 0.710940404, 0.765594865, 0.820607428, 0.877984079, 0.93725451, 1, 1, 1, 1], degree=3))
            add(Edge.make_bspline(
                [(0.205738091, 0.635993209), (0.238640814, 0.700768661), (0.303861654, 0.829168655), (0.385865127, 1.026897746), (0.459663901, 1.22391557), (0.516579645, 1.422967903), (0.561905142, 1.621957205), (0.593823909, 1.82108009), (0.613938148, 2.020726724), (0.616375849, 2.154108657), (0.617597066, 2.220929107)],
                knots=[0, 0, 0, 0, 0.131745637, 0.261150462, 0.388067803, 0.513189353, 0.636374668, 0.758087597, 0.878808958, 1, 1, 1, 1], degree=3))
            add(Edge.make_bspline(
                [(-1.116377293, -1.107596534), (-1.03496234, -1.013767374), (-0.878016077, -0.832889839), (-0.655626445, -0.569536189), (-0.456135085, -0.32390871), (-0.280159151, -0.096566641), (-0.125247461, 0.111659158), (0.00577288, 0.302221735), (0.116680709, 0.473318508), (0.177475044, 0.584367138), (0.205738091, 0.635993209)],
                knots=[0, 0, 0, 0, 0.170005554, 0.327725258, 0.471696803, 0.603008639, 0.721148947, 0.826797124, 0.919478664, 1, 1, 1, 1], degree=3))
            add(Edge.make_bspline(
                [(-2.664454216, -3.057917047), (-2.628698989, -3.000910883), (-2.55158858, -2.877970296), (-2.41479269, -2.688825323), (-2.259314405, -2.474715573), (-2.074551732, -2.243606397), (-1.870318919, -1.988170585), (-1.640593125, -1.712928149), (-1.387471618, -1.416348269), (-1.20904993, -1.213142224), (-1.116377293, -1.107596534)],
                knots=[0, 0, 0, 0, 0.080973991, 0.174630064, 0.280853316, 0.39944862, 0.530692677, 0.674513651, 0.830941638, 1, 1, 1, 1], degree=3))
            Line((-2.664454216, -3.057917047), (-2.664454216, -3.548301662))
            Line((-2.664454216, -3.548301662), (2.156058604, -3.548301662))
            Line((2.156058604, -3.548301662), (2.361186809, -0.984199098))
            Line((2.361186809, -0.984199098), (1.830738091, -0.984199098))
        make_face()
    extrude(amount=WRAP1_DEPTH)


solid = part.part
